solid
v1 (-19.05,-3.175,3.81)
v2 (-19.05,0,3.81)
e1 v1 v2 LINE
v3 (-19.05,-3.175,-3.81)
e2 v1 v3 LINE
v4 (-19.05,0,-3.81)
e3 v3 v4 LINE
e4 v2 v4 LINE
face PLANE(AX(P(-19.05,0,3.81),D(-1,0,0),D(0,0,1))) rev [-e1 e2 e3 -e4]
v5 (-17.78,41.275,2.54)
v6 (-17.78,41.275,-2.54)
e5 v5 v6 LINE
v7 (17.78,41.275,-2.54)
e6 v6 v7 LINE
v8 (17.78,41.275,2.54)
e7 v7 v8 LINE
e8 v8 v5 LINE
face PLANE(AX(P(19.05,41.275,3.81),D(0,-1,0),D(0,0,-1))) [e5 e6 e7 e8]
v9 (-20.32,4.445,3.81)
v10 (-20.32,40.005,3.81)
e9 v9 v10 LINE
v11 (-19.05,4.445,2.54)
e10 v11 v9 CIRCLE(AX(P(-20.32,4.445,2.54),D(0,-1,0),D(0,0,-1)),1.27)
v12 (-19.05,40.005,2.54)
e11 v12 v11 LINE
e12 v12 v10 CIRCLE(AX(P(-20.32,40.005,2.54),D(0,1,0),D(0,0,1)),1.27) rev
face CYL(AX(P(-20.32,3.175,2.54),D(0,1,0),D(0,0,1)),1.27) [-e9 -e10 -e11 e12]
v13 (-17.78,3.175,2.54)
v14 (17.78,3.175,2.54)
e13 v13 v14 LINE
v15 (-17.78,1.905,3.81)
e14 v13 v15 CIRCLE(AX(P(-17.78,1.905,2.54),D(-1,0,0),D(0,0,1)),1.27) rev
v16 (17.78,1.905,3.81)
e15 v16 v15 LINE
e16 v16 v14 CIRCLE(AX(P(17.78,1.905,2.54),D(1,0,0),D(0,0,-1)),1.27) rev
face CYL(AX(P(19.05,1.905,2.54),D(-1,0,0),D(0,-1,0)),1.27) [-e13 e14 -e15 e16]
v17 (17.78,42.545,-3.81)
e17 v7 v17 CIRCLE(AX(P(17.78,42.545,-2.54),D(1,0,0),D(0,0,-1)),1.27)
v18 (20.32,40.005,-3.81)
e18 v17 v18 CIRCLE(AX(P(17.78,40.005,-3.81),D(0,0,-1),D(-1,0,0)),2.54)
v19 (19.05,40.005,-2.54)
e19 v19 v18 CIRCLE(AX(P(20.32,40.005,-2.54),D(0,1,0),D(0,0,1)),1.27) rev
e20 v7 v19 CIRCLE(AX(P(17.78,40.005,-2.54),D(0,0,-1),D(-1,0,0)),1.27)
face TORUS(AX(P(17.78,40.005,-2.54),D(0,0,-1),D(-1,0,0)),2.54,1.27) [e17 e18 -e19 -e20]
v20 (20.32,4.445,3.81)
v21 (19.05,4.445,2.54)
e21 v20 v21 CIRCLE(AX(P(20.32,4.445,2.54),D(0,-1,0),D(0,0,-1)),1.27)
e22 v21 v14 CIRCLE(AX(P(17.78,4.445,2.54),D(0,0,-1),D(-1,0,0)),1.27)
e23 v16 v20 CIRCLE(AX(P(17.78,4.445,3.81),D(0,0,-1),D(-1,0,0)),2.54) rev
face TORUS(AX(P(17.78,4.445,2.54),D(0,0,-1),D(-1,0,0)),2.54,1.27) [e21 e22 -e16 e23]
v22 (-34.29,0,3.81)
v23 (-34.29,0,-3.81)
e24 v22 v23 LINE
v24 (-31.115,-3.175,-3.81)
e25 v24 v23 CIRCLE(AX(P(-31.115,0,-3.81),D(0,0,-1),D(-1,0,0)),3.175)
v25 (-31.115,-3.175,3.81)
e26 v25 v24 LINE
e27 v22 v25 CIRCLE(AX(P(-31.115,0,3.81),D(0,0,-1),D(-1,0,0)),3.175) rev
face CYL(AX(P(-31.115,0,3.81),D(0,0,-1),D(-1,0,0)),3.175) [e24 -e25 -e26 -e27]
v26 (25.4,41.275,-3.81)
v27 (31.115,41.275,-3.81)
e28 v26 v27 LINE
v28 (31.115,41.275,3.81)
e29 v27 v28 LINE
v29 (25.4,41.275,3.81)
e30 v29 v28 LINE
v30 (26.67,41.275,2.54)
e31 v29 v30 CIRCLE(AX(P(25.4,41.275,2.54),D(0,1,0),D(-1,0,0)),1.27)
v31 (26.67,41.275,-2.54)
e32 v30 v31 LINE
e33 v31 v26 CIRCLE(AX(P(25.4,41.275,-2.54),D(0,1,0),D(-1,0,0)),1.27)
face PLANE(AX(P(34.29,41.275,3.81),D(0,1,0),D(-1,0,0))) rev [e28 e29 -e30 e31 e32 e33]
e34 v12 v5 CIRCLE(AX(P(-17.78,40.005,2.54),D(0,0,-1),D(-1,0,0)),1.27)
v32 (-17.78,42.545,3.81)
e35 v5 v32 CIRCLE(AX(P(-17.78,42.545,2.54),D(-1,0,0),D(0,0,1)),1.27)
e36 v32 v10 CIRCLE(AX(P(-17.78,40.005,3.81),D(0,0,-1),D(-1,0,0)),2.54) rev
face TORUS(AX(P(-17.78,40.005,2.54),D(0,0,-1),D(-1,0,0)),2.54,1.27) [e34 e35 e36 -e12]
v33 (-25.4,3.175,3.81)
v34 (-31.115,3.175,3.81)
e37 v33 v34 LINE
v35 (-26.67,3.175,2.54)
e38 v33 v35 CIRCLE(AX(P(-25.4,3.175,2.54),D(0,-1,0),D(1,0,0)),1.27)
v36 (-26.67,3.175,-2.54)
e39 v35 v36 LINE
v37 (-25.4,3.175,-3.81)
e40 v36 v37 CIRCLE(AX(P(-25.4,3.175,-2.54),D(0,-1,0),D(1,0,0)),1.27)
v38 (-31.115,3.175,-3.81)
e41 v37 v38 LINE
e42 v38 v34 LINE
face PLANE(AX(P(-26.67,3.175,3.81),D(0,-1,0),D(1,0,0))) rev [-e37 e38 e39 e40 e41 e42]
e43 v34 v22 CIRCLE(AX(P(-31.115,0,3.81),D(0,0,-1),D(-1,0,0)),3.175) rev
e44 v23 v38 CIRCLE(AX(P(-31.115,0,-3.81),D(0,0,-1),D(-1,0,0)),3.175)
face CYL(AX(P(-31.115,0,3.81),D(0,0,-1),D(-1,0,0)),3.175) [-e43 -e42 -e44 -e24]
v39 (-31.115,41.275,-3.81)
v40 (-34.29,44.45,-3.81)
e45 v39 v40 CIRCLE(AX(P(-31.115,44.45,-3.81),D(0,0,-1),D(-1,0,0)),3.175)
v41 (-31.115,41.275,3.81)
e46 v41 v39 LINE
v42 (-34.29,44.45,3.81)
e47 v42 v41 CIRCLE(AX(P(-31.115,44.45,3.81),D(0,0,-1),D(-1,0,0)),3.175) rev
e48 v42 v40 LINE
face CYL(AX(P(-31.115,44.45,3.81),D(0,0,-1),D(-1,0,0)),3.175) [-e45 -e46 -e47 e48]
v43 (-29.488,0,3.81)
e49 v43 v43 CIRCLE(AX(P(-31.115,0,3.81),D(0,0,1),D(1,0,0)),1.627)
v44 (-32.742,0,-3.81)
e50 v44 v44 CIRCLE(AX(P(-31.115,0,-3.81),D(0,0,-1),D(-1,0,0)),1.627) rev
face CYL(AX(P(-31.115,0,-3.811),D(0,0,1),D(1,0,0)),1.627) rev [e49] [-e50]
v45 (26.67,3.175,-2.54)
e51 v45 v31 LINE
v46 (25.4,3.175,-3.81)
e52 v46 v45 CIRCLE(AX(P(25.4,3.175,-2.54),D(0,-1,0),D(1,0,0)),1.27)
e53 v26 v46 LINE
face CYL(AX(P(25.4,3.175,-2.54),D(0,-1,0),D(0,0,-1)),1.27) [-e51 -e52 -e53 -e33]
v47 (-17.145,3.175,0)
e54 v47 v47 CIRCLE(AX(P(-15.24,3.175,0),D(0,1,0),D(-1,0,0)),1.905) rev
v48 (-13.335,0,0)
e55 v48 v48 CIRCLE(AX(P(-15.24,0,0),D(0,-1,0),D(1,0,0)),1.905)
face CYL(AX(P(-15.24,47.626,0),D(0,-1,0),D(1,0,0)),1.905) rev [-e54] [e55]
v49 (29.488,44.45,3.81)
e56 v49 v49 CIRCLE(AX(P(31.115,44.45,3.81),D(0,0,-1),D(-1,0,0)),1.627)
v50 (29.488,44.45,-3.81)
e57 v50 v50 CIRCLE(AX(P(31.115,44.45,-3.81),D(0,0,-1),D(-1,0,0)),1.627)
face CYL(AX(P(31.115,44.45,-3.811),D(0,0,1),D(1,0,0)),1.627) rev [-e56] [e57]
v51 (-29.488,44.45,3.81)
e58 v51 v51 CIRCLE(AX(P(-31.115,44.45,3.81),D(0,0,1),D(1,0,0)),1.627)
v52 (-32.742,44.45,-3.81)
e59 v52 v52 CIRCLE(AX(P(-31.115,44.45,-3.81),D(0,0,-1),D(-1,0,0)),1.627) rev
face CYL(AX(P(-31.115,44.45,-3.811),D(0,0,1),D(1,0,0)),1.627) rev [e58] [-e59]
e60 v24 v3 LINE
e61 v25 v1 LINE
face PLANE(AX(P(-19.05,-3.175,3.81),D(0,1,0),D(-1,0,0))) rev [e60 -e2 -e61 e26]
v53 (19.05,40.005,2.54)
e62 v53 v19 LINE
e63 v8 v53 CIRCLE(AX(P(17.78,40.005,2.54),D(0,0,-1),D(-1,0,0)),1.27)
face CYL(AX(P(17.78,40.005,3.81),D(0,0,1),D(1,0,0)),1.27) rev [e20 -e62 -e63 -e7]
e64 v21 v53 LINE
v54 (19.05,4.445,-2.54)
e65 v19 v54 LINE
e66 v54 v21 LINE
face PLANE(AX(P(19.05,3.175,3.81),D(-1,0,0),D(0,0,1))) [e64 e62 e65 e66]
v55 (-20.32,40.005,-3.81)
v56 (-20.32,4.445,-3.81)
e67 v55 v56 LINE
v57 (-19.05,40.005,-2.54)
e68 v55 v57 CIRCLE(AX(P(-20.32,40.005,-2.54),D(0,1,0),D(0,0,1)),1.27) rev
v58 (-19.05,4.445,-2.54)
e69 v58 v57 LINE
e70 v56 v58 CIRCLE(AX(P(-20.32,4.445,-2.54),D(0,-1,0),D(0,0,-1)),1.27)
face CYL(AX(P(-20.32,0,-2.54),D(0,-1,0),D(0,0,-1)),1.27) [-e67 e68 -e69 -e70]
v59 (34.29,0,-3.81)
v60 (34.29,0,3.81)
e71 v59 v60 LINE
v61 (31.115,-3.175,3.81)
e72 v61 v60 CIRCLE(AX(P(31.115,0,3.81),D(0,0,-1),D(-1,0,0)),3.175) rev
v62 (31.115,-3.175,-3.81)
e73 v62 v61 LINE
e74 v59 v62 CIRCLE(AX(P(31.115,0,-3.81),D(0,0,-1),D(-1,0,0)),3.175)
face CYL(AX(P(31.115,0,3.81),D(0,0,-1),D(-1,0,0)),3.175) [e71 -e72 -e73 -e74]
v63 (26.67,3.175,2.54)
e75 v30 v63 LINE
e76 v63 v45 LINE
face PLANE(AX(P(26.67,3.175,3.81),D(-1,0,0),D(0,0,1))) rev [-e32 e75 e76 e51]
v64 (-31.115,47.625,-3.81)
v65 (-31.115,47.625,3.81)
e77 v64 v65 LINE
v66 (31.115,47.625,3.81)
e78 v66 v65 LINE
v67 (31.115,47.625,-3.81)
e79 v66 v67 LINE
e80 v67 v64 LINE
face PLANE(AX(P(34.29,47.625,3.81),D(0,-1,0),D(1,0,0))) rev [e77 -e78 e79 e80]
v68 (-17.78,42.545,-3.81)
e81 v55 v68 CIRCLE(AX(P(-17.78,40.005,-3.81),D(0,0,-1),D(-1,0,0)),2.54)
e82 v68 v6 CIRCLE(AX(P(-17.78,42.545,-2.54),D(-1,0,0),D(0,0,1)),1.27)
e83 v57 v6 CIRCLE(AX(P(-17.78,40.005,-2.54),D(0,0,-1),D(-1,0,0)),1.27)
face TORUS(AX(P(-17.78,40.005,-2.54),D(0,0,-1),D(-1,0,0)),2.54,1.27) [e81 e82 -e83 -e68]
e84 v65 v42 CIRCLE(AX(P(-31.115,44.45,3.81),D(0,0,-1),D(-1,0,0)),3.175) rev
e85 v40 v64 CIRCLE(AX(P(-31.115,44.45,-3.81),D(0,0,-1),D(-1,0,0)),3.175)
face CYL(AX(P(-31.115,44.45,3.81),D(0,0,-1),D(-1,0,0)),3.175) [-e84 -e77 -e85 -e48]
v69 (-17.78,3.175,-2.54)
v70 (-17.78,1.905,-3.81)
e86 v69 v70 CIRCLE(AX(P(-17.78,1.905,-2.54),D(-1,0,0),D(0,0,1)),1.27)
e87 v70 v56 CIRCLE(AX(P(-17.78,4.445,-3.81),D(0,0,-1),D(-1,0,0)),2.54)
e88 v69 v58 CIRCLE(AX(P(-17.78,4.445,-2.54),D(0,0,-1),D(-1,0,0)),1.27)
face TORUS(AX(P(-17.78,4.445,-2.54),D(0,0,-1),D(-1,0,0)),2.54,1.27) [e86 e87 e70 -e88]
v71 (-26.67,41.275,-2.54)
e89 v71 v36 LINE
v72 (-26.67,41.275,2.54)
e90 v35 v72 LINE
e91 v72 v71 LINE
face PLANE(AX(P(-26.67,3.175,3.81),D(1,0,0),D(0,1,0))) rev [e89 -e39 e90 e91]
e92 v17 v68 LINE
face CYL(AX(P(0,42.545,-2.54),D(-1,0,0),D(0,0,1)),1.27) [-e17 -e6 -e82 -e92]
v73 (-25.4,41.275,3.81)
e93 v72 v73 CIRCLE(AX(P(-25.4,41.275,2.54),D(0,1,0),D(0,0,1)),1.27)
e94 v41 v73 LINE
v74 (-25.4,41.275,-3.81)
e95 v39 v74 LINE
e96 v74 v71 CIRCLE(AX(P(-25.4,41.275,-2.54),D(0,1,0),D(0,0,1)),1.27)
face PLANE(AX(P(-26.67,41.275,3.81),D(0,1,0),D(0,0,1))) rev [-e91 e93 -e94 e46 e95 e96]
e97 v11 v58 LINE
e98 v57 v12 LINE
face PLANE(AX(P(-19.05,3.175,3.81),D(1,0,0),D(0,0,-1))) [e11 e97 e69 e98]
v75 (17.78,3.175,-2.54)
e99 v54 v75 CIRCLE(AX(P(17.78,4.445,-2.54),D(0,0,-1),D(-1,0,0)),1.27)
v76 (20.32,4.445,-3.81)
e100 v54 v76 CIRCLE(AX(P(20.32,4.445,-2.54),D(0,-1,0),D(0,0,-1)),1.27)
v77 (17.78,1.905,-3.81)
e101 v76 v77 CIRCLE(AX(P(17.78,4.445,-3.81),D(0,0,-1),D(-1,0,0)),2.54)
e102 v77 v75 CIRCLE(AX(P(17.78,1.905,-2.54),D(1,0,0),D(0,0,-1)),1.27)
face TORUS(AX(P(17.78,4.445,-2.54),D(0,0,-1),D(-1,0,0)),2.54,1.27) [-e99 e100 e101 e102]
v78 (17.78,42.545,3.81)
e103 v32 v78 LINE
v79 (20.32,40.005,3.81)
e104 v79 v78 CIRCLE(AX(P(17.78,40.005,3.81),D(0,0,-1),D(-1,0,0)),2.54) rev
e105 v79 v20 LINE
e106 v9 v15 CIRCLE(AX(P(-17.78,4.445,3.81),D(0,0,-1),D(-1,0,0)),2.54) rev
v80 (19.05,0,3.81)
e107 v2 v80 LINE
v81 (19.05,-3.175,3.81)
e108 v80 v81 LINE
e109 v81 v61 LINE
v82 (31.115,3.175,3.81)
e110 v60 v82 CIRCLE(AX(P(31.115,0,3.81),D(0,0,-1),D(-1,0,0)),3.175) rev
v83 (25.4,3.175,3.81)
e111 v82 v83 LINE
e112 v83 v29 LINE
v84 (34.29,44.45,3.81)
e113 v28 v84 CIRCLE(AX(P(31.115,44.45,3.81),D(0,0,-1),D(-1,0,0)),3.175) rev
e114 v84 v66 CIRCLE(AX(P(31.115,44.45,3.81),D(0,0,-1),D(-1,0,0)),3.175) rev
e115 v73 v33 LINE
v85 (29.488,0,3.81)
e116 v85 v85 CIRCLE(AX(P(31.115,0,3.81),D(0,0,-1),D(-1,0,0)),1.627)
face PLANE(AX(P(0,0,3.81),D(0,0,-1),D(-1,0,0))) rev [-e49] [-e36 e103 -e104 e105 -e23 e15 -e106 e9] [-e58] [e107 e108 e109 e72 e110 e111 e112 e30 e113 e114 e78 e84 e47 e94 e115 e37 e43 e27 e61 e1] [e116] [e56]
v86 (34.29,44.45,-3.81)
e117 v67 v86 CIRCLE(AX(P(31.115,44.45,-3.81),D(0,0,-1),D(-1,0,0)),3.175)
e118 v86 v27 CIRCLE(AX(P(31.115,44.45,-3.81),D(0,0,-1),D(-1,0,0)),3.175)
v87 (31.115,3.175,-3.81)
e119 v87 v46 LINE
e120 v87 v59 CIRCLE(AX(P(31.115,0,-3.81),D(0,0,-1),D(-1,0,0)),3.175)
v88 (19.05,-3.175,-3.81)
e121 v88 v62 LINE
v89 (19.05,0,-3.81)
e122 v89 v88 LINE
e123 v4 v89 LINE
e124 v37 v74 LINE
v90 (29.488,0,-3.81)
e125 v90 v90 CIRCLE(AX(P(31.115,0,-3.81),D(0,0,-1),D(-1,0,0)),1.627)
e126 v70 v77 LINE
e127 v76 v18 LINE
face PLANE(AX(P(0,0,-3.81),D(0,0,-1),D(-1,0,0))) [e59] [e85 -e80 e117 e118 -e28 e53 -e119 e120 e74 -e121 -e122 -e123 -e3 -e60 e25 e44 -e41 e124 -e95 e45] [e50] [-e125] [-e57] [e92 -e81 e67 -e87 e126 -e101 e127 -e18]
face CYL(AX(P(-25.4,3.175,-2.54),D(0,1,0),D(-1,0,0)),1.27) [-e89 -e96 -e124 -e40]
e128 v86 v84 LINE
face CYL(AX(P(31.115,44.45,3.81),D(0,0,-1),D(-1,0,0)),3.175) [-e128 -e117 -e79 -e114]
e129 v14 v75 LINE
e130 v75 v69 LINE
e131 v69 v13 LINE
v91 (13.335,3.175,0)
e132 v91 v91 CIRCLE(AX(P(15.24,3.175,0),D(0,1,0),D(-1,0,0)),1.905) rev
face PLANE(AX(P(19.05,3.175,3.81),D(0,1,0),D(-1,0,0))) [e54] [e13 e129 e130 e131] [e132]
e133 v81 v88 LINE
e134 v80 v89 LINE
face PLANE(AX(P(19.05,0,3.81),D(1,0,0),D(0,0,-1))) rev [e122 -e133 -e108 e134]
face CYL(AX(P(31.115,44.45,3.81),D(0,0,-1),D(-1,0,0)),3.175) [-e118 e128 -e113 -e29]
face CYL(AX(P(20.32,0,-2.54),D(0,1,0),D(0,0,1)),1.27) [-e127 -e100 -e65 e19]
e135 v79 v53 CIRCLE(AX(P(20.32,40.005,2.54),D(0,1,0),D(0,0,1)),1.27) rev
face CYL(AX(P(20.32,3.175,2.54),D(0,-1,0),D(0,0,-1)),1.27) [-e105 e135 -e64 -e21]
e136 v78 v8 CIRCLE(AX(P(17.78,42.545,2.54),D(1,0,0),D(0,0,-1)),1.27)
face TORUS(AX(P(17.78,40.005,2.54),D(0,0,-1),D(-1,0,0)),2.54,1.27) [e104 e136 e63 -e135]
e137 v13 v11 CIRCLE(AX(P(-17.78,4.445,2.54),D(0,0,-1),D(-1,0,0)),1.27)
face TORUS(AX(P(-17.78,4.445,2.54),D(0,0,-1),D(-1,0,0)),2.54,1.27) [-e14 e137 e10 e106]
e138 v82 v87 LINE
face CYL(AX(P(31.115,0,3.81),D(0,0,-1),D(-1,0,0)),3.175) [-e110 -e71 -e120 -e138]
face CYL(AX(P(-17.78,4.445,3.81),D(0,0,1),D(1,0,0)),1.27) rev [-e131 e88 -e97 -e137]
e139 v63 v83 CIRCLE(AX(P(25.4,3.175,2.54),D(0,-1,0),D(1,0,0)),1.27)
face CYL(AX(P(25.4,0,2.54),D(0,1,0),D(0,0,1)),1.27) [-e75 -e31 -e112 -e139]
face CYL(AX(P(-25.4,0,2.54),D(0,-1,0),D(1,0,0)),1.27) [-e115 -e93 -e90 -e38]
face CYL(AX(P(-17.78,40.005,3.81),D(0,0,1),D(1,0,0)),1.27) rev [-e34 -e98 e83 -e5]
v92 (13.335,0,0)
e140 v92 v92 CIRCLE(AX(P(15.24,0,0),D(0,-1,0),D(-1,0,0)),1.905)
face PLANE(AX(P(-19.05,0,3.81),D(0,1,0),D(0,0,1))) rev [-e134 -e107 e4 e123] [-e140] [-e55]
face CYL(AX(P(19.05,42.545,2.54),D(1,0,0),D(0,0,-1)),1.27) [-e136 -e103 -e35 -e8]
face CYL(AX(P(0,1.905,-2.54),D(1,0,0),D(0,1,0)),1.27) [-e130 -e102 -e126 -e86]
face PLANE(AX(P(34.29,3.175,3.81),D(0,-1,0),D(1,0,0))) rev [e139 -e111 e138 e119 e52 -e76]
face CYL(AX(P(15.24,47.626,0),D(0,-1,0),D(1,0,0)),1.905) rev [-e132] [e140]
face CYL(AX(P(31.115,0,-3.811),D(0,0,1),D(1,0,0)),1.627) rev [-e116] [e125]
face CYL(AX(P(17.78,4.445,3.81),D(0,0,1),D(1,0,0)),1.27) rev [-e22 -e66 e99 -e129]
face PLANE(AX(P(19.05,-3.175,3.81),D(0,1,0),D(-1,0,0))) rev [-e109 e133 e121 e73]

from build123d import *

# Parameters (mm, degrees)
SKETCH3_W           = 38.1
SKETCH3_H           = 38.1
BOSS_EXTRUDE2_DEPTH = 3.81
FILLET1_R           = 3.175
CUT_EXTRUDE1_REACH  = 61.178
SKETCH4_R           = 1.627
FILLET2_R           = 1.27
CUT_EXTRUDE2_REACH  = 60.809
SKETCH5_R           = 1.905


with BuildPart() as part:
    # Sketch3 → Boss-Extrude2 (new, symmetric)
    with BuildSketch(Plane.XY):
        Polygon((34.29, -3.175), (34.29, 3.175), (26.67, 3.175), (26.67, 41.275), (34.29, 41.275), (34.29, 47.625), (-34.29, 47.625), (-34.29, 41.275), (-26.67, 41.275), (-26.67, 3.175), (-34.29, 3.175), (-34.29, -3.175), (-19.05, -3.175), (-19.05, 0), (19.05, 0), (19.05, -3.175), align=None)
        with Locations((0, 22.225)):
            Rectangle(SKETCH3_W, SKETCH3_H, mode=Mode.SUBTRACT)
    extrude(amount=BOSS_EXTRUDE2_DEPTH, both=True)

    # Fillet1
    fillet1_edges = [part.edges().sort_by_distance(p)[0] for p in [
        (34.29, 3.175, 0),
        (34.29, 41.275, 0),
        (34.29, 47.625, 0),
        (-34.29, 3.175, 0),
        (-34.29, 41.275, 0),
        (-34.29, 47.625, 0),
        (34.29, -3.175, 0),
        (-34.29, -3.175, 0),
    ]]
    fillet(fillet1_edges, radius=FILLET1_R - 0.0001)  # a hair under: the kernel refuses the full size

    # Sketch4 → Cut-Extrude1 (cut, up to next)
    with BuildSketch(Plane.XY.offset(3.81), mode=Mode.PRIVATE) as cut_extrude1_sk1:
        with Locations((-31.115, 44.45)):
            Circle(SKETCH4_R)
    cut_extrude1_tool1 = extrude(cut_extrude1_sk1.sketch, amount=-CUT_EXTRUDE1_REACH, mode=Mode.PRIVATE) & part.part
    # Sketch4 → Cut-Extrude1 (cut, up to next)
    with BuildSketch(Plane.XY.offset(3.81), mode=Mode.PRIVATE) as cut_extrude1_sk2:
        with Locations((-31.115, 0)):
            Circle(SKETCH4_R)
    cut_extrude1_tool2 = extrude(cut_extrude1_sk2.sketch, amount=-CUT_EXTRUDE1_REACH, mode=Mode.PRIVATE) & part.part
    cut_extrude1_1 = cut_extrude1_tool1.solids().sort_by_distance((-31.115, 44.45, 3.81))[0]
    add(cut_extrude1_1, mode=Mode.SUBTRACT)
    cut_extrude1_2 = cut_extrude1_tool2.solids().sort_by_distance((-31.115, 0, 3.81))[0]
    add(cut_extrude1_2, mode=Mode.SUBTRACT)
    cut_extrude1 = cut_extrude1_1 + cut_extrude1_2  # Cut-Extrude1 as one shape, for the pattern or mirror that repeats it

    # Mirror1: Cut-Extrude1 across plane
    add(cut_extrude1.mirror(Plane(origin=(0, 0, 0), x_dir=(0, 0, 1), z_dir=(1, 0, 0))), mode=Mode.SUBTRACT)

    # Fillet2
    fillet2_edges = [part.edges().sort_by_distance(p)[0] for p in [
        (0, 3.175, 3.81),
        (0, 3.175, -3.81),
        (0, 41.275, 3.81),
        (0, 41.275, -3.81),
        (19.05, 41.275, 0),
        (19.05, 22.225, 3.81),
        (19.05, 3.175, 0),
        (19.05, 22.225, -3.81),
        (-19.05, 3.175, 0),
        (-19.05, 22.225, 3.81),
        (-19.05, 41.275, 0),
        (-19.05, 22.225, -3.81),
        (26.67, 22.225, 3.81),
        (26.67, 22.225, -3.81),
        (-26.67, 22.225, -3.81),
        (-26.67, 22.225, 3.81),
    ]]
    fillet(fillet2_edges, radius=FILLET2_R)

    # Sketch5 → Cut-Extrude2 (cut, up to next)
    with BuildSketch(Plane.XZ, mode=Mode.PRIVATE) as cut_extrude2_sk1:
        with Locations((-15.24, 0)):
            Circle(SKETCH5_R)
    cut_extrude2_tool1 = extrude(cut_extrude2_sk1.sketch, amount=-CUT_EXTRUDE2_REACH, mode=Mode.PRIVATE) & part.part
    # Sketch5 → Cut-Extrude2 (cut, up to next)
    with BuildSketch(Plane.XZ, mode=Mode.PRIVATE) as cut_extrude2_sk2:
        with Locations(Location((15.24, 0, 0), (0, 0, 180))):
            Circle(SKETCH5_R)
    cut_extrude2_tool2 = extrude(cut_extrude2_sk2.sketch, amount=-CUT_EXTRUDE2_REACH, mode=Mode.PRIVATE) & part.part
    add(cut_extrude2_tool1.solids().sort_by_distance((-15.24, 0, 0))[0], mode=Mode.SUBTRACT)
    add(cut_extrude2_tool2.solids().sort_by_distance((15.24, 0, 0))[0], mode=Mode.SUBTRACT)


solid = part.part
